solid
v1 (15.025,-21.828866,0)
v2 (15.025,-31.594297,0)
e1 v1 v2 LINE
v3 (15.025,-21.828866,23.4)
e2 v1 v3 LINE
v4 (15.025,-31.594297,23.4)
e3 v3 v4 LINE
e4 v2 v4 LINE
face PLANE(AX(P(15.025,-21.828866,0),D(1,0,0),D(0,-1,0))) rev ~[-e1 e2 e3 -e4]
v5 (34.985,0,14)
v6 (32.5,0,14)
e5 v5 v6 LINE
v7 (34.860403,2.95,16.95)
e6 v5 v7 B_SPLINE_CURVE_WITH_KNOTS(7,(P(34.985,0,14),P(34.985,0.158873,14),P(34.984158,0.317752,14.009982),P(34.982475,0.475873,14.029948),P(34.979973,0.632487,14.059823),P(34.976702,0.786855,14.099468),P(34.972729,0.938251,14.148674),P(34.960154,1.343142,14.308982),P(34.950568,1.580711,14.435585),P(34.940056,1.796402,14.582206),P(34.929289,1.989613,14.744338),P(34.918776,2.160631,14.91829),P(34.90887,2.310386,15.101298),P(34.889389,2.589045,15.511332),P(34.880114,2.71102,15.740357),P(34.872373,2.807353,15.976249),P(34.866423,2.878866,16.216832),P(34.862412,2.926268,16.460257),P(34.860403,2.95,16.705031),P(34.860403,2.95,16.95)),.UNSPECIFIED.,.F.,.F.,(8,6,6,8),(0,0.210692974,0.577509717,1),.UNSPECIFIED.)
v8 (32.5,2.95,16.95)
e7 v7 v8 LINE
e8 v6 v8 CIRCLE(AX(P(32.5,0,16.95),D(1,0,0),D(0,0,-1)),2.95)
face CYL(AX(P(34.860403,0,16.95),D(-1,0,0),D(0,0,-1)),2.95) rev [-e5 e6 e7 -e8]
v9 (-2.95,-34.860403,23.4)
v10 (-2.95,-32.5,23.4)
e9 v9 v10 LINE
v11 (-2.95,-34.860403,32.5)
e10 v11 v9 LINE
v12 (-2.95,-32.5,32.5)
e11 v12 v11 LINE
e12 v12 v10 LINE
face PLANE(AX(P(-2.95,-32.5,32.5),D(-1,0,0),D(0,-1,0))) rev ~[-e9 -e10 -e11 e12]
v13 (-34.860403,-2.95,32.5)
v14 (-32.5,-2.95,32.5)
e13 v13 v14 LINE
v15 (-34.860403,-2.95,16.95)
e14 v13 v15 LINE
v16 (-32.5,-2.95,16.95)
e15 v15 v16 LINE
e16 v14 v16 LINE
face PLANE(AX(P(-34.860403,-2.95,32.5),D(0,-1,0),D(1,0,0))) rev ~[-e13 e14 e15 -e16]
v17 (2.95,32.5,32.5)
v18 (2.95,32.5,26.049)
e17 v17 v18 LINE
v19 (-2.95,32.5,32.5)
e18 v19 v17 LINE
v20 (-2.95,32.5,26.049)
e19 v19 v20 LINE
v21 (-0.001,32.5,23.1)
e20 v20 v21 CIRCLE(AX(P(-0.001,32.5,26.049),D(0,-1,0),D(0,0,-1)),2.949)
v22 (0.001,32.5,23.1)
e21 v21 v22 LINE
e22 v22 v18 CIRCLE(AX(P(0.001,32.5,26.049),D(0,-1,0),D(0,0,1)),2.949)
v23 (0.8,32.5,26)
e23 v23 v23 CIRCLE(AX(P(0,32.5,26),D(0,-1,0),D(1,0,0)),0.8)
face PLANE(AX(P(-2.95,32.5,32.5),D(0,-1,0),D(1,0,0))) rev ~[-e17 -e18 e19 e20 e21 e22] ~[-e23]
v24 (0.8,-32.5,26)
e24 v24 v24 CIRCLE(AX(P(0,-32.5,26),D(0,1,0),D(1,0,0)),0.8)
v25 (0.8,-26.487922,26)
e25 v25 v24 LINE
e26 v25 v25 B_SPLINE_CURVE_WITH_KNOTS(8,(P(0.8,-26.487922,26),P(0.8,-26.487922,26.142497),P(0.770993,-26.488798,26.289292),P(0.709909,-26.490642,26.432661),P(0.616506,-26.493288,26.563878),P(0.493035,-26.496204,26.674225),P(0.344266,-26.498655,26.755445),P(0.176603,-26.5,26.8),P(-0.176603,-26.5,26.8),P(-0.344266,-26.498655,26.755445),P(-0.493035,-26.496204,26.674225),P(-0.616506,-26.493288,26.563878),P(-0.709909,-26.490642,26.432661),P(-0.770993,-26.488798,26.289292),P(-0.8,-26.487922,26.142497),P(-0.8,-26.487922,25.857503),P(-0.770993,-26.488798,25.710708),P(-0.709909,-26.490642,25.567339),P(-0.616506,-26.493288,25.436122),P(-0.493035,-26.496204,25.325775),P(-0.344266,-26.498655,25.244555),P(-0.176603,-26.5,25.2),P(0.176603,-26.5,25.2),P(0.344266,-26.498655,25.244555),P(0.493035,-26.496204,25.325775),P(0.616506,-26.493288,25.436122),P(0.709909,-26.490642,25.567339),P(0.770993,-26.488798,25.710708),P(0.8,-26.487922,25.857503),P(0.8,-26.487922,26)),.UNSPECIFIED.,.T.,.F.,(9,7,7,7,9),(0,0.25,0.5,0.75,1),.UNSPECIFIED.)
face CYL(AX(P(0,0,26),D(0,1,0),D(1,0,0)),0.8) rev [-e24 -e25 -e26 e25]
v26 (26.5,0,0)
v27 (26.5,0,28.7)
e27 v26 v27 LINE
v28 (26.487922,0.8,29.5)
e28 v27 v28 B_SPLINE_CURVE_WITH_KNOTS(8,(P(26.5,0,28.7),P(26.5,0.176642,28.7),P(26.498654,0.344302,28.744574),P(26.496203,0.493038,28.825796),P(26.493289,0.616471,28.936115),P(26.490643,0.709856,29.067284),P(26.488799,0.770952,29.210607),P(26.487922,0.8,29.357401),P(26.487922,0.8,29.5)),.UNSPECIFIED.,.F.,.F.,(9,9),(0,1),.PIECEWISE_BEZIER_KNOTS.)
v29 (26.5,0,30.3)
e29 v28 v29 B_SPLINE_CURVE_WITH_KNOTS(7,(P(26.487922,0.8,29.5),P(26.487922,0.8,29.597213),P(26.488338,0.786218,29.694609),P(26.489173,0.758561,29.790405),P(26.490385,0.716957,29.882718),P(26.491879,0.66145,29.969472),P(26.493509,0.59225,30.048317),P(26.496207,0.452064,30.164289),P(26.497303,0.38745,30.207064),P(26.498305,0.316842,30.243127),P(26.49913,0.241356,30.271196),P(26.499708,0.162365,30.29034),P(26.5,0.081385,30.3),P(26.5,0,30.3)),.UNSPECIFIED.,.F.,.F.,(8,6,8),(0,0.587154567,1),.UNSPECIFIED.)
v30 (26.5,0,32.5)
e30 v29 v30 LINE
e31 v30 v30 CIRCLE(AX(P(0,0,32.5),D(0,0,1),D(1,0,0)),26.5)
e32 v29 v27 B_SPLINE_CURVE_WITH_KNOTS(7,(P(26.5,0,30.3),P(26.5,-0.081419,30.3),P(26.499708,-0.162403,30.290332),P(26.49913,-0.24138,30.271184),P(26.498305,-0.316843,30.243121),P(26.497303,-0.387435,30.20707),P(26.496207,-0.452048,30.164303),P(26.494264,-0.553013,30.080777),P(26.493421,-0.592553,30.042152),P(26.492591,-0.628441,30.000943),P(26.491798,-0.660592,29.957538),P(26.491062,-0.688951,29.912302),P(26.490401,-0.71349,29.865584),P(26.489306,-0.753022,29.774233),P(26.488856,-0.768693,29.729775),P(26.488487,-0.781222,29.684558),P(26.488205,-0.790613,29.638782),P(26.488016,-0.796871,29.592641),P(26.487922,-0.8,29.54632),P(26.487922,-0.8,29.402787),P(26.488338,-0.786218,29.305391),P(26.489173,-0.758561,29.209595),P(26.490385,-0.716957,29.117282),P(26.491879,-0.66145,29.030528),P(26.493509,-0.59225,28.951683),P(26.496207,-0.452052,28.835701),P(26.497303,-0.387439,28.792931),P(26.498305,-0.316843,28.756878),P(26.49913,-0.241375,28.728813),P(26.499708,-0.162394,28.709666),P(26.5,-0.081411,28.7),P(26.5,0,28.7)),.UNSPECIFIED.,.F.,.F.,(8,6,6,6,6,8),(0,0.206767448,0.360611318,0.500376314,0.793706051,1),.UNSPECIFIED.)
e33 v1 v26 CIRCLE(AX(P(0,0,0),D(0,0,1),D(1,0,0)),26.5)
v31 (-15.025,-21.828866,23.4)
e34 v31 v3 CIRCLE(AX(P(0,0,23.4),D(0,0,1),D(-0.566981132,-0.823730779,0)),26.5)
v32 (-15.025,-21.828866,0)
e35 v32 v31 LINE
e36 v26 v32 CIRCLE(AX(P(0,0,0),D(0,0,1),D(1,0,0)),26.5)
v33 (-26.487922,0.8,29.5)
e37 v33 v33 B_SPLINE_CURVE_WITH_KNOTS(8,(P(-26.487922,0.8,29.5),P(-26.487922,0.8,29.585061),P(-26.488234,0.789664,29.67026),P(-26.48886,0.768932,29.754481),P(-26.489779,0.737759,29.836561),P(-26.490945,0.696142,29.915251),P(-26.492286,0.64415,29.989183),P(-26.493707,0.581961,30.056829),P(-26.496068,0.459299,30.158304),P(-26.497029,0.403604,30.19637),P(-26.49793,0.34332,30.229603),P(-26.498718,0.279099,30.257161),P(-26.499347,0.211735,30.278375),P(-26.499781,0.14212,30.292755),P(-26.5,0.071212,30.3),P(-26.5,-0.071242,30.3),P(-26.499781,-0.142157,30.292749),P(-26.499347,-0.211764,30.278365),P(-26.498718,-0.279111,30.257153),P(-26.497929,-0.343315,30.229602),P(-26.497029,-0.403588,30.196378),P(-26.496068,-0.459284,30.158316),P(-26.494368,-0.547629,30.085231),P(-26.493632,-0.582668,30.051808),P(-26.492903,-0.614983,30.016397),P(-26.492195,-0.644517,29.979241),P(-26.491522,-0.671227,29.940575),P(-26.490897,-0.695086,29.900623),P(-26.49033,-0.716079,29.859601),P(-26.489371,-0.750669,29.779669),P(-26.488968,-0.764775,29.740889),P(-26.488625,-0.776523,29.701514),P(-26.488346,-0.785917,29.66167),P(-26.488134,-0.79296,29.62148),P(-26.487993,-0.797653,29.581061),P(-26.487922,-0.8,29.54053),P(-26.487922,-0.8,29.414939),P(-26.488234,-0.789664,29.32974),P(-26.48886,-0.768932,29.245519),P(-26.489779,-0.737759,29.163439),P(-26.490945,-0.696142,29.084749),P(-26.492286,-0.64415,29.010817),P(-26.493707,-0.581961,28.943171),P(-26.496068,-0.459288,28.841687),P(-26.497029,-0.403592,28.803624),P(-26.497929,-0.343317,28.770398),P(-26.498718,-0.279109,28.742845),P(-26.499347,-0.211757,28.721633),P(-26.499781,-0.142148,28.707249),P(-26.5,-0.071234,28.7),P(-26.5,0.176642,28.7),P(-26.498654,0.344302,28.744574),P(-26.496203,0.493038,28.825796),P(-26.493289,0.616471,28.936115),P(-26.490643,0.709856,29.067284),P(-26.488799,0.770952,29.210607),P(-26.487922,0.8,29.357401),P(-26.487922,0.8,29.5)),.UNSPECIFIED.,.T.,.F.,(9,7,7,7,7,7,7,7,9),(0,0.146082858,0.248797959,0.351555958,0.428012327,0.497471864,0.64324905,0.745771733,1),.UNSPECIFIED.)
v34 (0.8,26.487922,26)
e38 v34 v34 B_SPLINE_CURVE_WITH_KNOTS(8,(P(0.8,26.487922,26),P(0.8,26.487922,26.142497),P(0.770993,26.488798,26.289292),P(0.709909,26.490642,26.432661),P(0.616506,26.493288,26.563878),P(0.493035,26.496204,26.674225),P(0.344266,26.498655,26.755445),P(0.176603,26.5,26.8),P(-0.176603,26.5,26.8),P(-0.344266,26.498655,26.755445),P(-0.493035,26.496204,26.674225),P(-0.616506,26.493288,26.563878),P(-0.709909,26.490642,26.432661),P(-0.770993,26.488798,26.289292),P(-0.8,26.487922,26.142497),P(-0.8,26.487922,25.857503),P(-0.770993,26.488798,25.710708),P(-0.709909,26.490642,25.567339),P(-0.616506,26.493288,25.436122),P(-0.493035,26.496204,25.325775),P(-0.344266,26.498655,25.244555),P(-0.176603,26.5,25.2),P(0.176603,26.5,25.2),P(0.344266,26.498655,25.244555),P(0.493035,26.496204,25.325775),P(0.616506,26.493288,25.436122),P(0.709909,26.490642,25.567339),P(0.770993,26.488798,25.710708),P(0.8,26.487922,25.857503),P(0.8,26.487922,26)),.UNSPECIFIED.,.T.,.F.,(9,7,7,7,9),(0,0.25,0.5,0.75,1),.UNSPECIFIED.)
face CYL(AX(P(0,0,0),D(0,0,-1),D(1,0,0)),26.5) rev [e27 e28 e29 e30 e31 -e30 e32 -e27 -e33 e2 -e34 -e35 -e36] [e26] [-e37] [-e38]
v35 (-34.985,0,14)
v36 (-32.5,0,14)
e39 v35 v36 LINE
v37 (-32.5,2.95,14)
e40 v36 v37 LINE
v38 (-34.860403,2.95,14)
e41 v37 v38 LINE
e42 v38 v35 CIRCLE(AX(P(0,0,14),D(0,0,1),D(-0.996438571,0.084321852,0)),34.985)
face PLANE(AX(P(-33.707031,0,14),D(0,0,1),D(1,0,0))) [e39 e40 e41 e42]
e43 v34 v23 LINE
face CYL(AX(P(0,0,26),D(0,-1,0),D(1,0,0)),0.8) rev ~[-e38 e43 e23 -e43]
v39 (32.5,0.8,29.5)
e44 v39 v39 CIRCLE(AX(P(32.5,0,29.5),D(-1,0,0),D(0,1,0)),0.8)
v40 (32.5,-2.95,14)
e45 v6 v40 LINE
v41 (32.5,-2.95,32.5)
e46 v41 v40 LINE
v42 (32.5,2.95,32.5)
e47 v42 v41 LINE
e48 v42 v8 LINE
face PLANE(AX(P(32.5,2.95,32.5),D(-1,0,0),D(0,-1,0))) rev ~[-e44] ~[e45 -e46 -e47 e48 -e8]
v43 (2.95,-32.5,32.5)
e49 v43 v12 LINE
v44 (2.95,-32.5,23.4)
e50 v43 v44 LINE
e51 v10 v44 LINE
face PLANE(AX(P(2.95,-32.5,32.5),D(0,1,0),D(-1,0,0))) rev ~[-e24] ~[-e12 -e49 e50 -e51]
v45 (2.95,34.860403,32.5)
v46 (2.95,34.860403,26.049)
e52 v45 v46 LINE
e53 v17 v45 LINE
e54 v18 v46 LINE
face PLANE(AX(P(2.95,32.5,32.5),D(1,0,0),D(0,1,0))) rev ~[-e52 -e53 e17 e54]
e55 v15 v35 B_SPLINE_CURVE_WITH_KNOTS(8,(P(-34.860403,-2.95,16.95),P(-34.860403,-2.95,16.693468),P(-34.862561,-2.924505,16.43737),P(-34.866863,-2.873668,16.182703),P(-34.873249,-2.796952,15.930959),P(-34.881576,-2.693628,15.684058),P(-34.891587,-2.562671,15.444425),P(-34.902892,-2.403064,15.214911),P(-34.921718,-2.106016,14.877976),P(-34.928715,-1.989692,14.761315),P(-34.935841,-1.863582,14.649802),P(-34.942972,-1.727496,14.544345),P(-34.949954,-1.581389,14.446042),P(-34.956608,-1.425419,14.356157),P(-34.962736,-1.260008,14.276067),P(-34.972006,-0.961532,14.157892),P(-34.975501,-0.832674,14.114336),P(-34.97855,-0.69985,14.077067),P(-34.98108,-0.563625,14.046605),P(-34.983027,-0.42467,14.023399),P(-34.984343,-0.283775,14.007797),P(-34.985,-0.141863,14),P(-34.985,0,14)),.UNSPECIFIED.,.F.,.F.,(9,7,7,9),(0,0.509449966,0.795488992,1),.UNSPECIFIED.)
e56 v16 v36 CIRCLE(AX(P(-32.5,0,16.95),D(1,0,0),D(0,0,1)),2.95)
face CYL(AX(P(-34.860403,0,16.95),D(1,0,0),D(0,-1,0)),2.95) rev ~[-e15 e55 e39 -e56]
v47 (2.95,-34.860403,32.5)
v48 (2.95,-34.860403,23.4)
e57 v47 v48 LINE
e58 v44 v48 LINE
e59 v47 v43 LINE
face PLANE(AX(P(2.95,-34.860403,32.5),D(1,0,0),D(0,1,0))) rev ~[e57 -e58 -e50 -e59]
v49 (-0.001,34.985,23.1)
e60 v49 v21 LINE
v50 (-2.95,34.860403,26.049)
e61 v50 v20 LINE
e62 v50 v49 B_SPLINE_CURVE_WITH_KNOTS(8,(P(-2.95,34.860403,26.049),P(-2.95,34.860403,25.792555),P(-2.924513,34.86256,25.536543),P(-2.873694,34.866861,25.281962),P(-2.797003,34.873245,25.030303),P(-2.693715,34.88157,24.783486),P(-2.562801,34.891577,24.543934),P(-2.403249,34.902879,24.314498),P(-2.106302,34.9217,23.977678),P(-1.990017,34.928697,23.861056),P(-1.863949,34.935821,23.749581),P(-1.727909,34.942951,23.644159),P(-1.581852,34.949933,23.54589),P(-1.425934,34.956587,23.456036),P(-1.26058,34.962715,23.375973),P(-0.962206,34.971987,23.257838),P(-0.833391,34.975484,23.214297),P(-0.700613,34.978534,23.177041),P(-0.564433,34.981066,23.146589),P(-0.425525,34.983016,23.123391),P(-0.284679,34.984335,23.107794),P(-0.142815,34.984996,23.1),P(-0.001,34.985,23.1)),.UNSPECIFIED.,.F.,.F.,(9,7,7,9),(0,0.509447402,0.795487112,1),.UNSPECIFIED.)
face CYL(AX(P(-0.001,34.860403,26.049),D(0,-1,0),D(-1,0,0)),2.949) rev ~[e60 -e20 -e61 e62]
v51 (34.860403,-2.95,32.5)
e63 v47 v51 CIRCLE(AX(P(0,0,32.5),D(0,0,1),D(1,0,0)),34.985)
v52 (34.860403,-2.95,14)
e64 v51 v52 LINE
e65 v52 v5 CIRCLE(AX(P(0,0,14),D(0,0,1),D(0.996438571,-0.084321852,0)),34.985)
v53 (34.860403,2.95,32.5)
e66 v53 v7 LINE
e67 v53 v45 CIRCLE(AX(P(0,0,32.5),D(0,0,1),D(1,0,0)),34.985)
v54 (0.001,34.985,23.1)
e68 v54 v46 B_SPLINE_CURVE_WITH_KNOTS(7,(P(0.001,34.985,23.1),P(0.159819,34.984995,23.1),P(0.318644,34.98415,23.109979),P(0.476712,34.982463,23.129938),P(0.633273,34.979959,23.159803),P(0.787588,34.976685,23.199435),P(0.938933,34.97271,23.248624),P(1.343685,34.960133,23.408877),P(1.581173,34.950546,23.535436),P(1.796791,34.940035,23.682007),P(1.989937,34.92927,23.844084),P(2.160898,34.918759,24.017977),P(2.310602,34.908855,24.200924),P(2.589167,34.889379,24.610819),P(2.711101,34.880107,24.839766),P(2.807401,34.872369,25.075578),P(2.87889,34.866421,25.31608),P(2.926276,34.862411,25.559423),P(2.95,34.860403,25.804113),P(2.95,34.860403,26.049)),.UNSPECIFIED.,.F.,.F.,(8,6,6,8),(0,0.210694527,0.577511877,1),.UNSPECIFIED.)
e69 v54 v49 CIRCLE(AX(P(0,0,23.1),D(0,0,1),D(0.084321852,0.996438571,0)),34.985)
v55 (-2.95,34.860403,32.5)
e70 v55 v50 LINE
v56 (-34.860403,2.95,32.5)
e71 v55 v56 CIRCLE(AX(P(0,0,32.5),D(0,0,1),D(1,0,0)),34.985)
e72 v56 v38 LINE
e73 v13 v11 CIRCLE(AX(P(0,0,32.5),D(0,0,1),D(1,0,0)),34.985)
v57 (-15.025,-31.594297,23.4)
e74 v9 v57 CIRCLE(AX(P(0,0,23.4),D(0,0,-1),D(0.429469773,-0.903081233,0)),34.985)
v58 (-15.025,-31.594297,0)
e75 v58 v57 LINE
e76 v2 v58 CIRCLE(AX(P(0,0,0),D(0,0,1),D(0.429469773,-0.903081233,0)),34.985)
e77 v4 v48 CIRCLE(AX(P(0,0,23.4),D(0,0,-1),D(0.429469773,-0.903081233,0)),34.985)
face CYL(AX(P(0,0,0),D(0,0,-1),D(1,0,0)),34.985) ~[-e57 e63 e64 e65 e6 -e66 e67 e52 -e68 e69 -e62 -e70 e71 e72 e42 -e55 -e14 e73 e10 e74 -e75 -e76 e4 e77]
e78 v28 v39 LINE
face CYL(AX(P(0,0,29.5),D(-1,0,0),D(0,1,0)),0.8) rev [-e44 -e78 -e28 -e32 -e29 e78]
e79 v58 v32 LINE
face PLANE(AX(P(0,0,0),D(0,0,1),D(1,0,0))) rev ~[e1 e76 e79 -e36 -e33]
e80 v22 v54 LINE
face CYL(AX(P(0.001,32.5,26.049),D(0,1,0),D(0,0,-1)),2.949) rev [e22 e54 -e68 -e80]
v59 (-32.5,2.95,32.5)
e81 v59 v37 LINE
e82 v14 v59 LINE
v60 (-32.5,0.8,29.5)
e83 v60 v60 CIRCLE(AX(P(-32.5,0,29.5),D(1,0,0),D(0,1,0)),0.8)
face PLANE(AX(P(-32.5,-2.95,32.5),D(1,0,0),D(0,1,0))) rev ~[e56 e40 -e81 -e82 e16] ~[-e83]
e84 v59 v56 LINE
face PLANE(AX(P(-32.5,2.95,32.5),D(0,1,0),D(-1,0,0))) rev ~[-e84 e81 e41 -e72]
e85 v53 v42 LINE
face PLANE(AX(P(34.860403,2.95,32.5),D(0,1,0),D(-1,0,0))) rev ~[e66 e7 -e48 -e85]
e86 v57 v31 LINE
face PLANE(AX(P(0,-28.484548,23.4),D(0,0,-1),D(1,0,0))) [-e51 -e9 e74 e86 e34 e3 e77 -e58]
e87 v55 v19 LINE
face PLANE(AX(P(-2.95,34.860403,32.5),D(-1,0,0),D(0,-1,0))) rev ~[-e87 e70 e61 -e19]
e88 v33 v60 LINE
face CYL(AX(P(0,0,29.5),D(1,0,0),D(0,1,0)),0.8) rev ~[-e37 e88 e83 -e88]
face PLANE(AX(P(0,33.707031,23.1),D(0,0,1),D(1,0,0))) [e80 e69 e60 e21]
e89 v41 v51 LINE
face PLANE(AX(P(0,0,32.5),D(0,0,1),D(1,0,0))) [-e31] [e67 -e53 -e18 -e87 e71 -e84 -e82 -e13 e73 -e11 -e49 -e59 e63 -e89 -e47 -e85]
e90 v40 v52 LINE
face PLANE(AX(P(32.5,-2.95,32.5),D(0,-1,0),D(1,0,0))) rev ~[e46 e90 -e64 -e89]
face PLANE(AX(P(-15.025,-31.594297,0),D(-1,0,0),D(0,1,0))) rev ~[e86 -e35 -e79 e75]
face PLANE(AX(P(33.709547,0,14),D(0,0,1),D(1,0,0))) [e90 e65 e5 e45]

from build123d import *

# Parameters (mm, degrees)
F0_R           = 34.985
F0_R_2         = 26.5
F1_DEPTH       = 32.5
F3_DEPTH       = 23.4
F5_DEPTH       = 18.5
F6_R           = 2.95
F7_R           = 0.8
F8_DEPTH       = 34.9860001
F8_DEPTH_BACK  = 34.9860001
F10_DEPTH      = 9.4
F11_R          = 2.949
F12_R          = 0.8
F13_DEPTH      = 34.9860001
F13_DEPTH_BACK = 34.861403497


# Not quite as in the source:
# - a fillet or chamfer is up to 0.001 mm smaller than in the source, because OpenCascade refuses the exact size


with BuildPart() as f1:
    # F0 (on Top) → F1 (new body)
    with BuildSketch(Plane.XY):
        Circle(F0_R)
        Circle(F0_R_2, mode=Mode.SUBTRACT)
    extrude(amount=F1_DEPTH)

    # F2 (on face) → F3 (cut)
    with BuildSketch(Plane(origin=(0, 0, 0), x_dir=(1, 0, 0), z_dir=(0, 0, -1))):
        with BuildLine():
            ThreePointArc((15.025, 31.5942969537), (0, 34.985), (-15.025, 31.5942969537))
            Line((-15.025, 31.5942969537), (-15.025, 21.828865637))
            ThreePointArc((-15.025, 21.828865637), (0, 26.5), (15.025, 21.828865637))
            Line((15.025, 21.828865637), (15.025, 31.5942969537))
        make_face()
    extrude(amount=-F3_DEPTH, mode=Mode.SUBTRACT)

    # F4 (on face) → F5 (cut)
    with BuildSketch(Plane.XY.offset(32.5)):
        with BuildLine():
            ThreePointArc((34.985, 0), (34.9538369699, 1.4763150336), (34.860403397, 2.95))
            Line((34.860403397, 2.95), (32.5, 2.95))
            Line((32.5, 2.95), (32.5, -2.95))
            Line((32.5, -2.95), (34.860403397, -2.95))
            ThreePointArc((34.860403397, -2.95), (34.9538369699, -1.4763150336), (34.985, 0))
        make_face()
        with BuildLine():
            Line((-32.5, 2.95), (-34.860403397, 2.95))
            ThreePointArc((-34.860403397, 2.95), (-34.985, 0), (-34.860403397, -2.95))
            Line((-34.860403397, -2.95), (-32.5, -2.95))
            Line((-32.5, -2.95), (-32.5, 2.95))
        make_face()
    extrude(amount=-F5_DEPTH, mode=Mode.SUBTRACT)

    # F6
    f6_edges = [f1.edges().sort_by_distance(p)[0] for p in [
        (-33.680202, -2.95, 14),
        (33.680202, 2.95, 14),
    ]]
    fillet(f6_edges, radius=F6_R)

    # F7 (on Right) → F8 (cut, two sides)
    with BuildSketch(Plane.YZ) as f8_sk:
        with Locations((0, 29.5)):
            Circle(F7_R)
    extrude(amount=-F8_DEPTH, mode=Mode.SUBTRACT)
    extrude(f8_sk.sketch, amount=F8_DEPTH_BACK, mode=Mode.SUBTRACT)

    # F9 (on face) → F10 (cut)
    with BuildSketch(Plane.XY.offset(32.5)):
        with BuildLine():
            ThreePointArc((2.95, 34.860403397), (0, 34.985), (-2.95, 34.860403397))
            Line((-2.95, 34.860403397), (-2.95, 32.5))
            Line((-2.95, 32.5), (2.95, 32.5))
            Line((2.95, 32.5), (2.95, 34.860403397))
        make_face()
        with BuildLine():
            Line((-2.95, -32.5), (-2.95, -34.860403397))
            ThreePointArc((-2.95, -34.860403397), (0, -34.985), (2.95, -34.860403397))
            Line((2.95, -34.860403397), (2.95, -32.5))
            Line((2.95, -32.5), (-2.95, -32.5))
        make_face()
    extrude(amount=-F10_DEPTH, mode=Mode.SUBTRACT)

    # F11 (radius 2.95 in the source; OpenCascade refuses exactly that, so slightly less here)
    f11_edges = [f1.edges().sort_by_distance(p)[0] for p in [
        (-2.95, 33.680202, 23.1),
        (2.95, 33.680202, 23.1),
    ]]
    fillet(f11_edges, radius=F11_R)

    # F12 (on Front) → F13 (cut, two sides)
    with BuildSketch(Plane.XZ) as f13_sk:
        with Locations((0, 26)):
            Circle(F12_R)
    extrude(amount=-F13_DEPTH, mode=Mode.SUBTRACT)
    extrude(f13_sk.sketch, amount=F13_DEPTH_BACK, mode=Mode.SUBTRACT)


solid = f1.part
